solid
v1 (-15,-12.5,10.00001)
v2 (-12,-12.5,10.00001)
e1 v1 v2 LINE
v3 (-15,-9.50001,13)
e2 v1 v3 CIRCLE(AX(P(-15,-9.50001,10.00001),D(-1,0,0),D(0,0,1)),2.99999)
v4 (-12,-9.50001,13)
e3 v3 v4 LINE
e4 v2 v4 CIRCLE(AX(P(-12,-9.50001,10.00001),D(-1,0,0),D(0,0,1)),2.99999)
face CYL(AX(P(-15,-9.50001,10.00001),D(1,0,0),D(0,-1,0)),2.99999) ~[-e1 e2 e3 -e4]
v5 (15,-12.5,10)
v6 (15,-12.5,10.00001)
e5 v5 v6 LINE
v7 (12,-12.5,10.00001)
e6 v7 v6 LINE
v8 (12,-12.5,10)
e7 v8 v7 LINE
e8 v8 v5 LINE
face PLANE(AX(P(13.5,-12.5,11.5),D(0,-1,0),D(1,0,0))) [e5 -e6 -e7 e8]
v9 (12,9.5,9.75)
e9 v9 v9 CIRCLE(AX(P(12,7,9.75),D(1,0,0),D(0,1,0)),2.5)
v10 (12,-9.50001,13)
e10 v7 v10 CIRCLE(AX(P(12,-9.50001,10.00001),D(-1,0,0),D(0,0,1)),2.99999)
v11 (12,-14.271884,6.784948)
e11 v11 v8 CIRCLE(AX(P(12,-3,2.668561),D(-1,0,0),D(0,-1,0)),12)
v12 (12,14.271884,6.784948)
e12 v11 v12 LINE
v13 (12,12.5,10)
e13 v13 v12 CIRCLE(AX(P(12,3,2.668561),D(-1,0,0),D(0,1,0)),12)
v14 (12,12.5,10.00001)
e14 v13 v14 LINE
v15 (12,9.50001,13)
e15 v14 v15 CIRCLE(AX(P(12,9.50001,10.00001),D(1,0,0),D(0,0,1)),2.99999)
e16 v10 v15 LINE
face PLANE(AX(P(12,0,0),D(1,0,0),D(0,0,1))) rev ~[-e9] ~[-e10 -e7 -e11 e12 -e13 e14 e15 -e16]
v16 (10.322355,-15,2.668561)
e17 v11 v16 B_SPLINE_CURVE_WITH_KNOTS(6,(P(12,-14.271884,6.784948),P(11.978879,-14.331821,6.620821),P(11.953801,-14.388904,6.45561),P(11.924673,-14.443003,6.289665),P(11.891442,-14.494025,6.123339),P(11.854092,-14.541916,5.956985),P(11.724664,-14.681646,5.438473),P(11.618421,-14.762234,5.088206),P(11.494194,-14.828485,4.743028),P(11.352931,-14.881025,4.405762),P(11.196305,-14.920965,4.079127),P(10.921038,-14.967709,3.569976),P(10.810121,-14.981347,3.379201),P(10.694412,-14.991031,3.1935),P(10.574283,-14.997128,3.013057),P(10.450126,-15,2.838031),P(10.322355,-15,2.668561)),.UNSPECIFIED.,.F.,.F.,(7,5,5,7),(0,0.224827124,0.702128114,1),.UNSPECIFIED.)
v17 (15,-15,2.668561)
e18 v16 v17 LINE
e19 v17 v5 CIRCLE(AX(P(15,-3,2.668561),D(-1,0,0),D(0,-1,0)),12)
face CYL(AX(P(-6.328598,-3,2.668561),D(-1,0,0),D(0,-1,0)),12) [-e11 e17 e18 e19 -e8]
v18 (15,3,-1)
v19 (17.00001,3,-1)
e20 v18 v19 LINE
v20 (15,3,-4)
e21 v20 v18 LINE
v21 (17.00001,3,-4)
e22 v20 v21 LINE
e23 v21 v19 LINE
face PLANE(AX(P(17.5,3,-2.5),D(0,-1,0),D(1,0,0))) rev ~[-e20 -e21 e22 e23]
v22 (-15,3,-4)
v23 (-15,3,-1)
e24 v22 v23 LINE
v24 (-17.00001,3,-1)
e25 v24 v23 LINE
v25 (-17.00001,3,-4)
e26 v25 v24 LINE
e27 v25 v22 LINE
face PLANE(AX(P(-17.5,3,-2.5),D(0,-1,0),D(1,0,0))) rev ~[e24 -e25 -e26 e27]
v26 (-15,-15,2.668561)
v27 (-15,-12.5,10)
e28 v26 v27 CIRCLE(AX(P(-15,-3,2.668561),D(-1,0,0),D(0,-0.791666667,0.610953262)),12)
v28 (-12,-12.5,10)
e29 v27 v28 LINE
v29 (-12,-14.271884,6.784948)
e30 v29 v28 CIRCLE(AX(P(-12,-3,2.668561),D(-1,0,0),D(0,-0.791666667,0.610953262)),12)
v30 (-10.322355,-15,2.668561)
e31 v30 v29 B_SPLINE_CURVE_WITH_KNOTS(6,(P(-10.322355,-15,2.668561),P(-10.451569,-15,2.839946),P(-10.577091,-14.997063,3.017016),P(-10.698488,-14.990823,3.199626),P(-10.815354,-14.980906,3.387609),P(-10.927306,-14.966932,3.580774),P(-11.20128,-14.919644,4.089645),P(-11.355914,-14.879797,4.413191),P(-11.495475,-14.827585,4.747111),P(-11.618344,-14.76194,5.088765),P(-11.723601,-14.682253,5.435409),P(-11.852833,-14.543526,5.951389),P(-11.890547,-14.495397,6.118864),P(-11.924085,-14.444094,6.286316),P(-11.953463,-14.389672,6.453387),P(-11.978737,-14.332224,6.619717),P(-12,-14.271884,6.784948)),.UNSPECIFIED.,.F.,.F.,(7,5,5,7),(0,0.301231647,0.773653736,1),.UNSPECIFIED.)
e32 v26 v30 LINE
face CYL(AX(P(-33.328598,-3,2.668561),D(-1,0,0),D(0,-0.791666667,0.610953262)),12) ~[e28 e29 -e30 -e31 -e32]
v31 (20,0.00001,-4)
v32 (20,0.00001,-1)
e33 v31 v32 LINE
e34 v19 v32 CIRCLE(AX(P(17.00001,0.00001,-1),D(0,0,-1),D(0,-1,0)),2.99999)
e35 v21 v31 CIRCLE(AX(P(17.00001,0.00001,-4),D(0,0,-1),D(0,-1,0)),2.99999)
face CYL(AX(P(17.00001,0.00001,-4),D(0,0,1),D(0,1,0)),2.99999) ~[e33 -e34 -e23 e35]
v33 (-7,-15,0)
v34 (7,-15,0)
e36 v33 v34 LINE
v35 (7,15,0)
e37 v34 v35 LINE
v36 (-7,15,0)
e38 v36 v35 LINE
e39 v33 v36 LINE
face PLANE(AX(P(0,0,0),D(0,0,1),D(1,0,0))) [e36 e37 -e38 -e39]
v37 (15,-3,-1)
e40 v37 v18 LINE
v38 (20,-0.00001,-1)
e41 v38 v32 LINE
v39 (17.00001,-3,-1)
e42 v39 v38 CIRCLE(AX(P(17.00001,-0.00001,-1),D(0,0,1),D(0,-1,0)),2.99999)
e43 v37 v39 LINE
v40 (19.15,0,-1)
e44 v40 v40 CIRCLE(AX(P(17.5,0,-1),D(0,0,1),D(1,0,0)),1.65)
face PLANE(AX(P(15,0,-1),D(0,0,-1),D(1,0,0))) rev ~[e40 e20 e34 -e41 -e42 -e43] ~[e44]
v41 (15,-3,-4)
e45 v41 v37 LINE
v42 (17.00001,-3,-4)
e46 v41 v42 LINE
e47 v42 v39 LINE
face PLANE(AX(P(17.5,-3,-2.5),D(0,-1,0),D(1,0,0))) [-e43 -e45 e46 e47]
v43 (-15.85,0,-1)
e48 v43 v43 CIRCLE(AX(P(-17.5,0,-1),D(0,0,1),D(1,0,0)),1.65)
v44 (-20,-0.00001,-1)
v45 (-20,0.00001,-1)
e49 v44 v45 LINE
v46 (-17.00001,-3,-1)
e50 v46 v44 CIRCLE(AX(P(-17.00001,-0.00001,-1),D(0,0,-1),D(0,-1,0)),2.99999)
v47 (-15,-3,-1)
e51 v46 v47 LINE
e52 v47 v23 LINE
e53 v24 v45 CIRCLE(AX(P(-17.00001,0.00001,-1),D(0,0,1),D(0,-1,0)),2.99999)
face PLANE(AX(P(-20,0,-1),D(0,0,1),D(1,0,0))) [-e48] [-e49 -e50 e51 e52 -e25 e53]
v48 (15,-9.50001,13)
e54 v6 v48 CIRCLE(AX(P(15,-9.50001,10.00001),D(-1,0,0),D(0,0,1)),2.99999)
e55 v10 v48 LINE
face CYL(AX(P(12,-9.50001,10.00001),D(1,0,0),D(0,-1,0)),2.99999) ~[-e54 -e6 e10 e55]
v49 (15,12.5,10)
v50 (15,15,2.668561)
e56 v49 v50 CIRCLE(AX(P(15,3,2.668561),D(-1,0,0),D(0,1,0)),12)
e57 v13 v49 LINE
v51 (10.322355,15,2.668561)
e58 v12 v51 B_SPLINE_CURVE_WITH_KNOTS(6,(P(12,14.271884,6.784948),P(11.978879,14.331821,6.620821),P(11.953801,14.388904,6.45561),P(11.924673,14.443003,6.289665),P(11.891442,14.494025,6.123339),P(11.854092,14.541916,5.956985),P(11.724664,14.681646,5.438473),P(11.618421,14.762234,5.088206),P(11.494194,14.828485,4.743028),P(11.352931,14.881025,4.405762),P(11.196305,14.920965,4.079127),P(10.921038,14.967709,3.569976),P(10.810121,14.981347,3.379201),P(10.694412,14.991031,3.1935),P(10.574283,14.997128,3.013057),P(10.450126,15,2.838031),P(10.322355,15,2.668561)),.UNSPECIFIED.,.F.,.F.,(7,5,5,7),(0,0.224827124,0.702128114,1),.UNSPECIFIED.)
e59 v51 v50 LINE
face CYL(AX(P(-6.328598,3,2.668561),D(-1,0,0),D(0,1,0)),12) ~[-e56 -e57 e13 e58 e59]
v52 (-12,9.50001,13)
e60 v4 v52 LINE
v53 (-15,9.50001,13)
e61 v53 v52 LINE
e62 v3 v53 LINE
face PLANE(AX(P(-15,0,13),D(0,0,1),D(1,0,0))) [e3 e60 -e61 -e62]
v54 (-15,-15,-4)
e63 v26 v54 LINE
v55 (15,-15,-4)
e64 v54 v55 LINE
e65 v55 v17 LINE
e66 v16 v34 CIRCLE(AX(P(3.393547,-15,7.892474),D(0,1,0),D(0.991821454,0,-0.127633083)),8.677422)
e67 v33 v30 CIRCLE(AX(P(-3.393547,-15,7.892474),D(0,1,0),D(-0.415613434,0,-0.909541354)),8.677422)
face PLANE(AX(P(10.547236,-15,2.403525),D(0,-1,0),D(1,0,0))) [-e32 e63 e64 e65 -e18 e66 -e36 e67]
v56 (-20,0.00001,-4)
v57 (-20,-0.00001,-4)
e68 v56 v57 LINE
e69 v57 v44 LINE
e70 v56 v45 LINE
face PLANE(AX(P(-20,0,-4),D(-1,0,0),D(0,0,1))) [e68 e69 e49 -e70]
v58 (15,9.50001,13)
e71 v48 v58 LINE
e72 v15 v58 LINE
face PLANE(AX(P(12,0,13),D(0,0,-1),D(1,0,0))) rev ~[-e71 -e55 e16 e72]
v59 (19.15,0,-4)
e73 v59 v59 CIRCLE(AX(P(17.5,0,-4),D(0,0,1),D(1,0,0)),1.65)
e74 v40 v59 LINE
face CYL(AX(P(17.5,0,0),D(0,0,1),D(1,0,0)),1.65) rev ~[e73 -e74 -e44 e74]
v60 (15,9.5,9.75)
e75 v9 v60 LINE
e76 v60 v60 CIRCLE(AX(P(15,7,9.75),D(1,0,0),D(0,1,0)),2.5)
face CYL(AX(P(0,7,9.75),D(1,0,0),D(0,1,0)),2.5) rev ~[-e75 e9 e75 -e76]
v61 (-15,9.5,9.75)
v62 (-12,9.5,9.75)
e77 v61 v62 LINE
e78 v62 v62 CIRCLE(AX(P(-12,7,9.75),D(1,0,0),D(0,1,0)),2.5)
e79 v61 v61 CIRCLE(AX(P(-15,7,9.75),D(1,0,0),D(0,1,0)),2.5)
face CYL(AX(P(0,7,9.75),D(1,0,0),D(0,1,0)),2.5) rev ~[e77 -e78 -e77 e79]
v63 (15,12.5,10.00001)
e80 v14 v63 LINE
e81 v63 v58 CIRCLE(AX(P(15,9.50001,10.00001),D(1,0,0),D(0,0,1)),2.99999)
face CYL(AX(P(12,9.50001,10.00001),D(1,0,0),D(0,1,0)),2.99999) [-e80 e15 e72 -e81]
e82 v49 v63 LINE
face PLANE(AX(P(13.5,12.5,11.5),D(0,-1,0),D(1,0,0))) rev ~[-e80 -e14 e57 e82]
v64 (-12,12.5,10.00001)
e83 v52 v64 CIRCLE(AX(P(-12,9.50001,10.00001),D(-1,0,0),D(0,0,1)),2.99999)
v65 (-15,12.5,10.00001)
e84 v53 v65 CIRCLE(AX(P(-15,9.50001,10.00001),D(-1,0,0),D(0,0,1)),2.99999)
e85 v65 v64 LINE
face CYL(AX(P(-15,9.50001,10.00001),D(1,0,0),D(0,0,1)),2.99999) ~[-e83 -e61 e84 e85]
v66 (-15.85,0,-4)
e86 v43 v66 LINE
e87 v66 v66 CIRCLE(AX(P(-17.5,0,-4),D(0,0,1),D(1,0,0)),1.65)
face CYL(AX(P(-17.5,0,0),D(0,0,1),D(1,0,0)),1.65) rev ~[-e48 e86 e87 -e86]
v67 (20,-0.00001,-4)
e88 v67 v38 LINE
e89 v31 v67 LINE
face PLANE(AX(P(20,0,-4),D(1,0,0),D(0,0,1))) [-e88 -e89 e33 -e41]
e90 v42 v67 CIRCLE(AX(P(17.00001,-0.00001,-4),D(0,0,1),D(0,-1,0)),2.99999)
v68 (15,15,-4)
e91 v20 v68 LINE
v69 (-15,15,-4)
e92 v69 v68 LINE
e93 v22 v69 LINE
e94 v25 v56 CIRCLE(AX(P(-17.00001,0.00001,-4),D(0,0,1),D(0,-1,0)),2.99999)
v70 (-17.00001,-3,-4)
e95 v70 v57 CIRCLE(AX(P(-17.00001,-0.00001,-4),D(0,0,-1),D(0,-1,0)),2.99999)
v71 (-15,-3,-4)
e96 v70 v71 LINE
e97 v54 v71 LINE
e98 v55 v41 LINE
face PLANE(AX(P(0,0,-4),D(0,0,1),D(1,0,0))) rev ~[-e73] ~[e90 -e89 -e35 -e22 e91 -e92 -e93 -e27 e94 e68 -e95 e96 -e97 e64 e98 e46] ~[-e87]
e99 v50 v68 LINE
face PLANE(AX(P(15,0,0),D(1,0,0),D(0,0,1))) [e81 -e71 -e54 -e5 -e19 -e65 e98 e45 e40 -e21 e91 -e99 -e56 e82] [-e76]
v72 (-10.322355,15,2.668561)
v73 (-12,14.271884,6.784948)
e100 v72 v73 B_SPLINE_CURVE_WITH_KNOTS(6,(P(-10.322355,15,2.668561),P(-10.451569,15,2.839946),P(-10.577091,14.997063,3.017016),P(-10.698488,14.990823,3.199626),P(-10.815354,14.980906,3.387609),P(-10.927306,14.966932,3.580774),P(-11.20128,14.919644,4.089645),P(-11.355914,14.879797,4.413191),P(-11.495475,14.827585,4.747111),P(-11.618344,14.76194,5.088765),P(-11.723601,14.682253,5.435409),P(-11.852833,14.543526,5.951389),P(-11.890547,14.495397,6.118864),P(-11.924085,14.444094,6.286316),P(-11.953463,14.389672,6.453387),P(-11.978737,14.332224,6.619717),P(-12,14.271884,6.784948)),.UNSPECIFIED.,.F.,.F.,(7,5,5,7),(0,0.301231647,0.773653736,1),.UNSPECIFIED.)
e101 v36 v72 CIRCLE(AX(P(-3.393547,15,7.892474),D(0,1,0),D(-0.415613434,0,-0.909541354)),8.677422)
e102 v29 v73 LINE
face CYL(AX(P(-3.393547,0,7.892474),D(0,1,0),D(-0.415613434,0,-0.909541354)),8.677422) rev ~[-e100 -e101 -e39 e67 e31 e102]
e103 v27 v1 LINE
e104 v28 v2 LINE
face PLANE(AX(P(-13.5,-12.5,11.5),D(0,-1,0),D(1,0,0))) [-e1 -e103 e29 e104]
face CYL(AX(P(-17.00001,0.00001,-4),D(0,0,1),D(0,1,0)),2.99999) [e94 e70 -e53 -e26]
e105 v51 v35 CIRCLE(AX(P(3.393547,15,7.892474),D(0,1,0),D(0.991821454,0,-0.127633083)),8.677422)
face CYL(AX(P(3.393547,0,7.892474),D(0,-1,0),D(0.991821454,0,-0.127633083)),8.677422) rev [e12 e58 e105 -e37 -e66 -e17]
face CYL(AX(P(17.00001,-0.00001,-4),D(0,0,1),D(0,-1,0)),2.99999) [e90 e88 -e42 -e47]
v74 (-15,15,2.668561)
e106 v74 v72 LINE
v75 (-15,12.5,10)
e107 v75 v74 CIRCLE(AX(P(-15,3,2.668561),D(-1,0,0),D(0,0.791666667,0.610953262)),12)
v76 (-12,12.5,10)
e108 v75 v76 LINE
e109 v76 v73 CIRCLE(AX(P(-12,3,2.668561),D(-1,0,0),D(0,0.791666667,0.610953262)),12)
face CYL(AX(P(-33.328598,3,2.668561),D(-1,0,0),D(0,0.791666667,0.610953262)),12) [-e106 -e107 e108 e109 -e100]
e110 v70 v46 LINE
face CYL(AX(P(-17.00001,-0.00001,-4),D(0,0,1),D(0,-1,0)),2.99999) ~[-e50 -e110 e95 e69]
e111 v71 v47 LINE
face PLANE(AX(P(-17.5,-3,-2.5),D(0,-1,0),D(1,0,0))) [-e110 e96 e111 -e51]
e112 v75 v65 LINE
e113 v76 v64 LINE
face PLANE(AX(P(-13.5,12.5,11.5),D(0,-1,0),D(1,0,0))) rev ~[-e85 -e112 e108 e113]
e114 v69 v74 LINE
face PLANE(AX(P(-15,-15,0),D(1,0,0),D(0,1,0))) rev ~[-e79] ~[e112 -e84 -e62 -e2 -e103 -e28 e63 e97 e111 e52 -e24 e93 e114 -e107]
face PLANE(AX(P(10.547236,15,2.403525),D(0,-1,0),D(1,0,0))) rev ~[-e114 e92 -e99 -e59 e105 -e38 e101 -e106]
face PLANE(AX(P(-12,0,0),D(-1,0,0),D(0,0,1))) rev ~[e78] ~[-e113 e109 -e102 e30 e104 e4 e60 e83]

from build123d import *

# Parameters (mm, degrees)
F0_W         = 30
F0_H         = 30
F1_DEPTH     = 4
F2_W         = 3
F2_H         = 10
F3_DEPTH     = 15
F5_DEPTH     = 15
F6_W         = 5
F6_H         = 3
F7_DEPTH     = 3
F8_R         = 2.99999
F9_R         = 1.65
F10_DEPTH    = 25
F11_W        = 3
F11_H        = 3
F12_DEPTH    = 12.5
F13_R        = 2.99999
F14_R        = 2.5
F15_DEPTH    = 18.8
F16_T1_DEPTH = 39.6571957465
F16_T3_DEPTH = 39.6571957465


# Not quite as in the source:
# - a fillet or chamfer that OpenCascade refuses, or shapes differently, is made with other operations: its cross-section is extruded or revolved along the edge and cut away or added
# - a fillet or chamfer is up to 0.001 mm smaller than in the source, because OpenCascade refuses the exact size


with BuildPart() as f1:
    # F0 (on Top) → F1 (new body)
    with BuildSketch(Plane.XY):
        Rectangle(F0_W, F0_H)
    extrude(amount=-F1_DEPTH)

    # F2 (on Front) → F3 (join, symmetric)
    with BuildSketch(Plane.XZ):
        with Locations((-13.5, 5)):
            Rectangle(F2_W, F2_H)
        with Locations((13.5, 5)):
            Rectangle(F2_W, F2_H)
    extrude(amount=F3_DEPTH, both=True)

    # F4 (on Front) → F5 (join, symmetric)
    with BuildSketch(Plane.XZ):
        with BuildLine():
            Line((-12, 6.7849478247), (-12, 9))
            ThreePointArc((-12, 9), (-12.0709686948, 7.8924739124), (-12, 6.7849478247))
        make_face()
        with BuildLine():
            ThreePointArc((-7, 0), (-10.3790782907, 2.7446588419), (-12, 6.7849478247))
            Line((-12, 6.7849478247), (-12, 0))
            Line((-12, 0), (-7, 0))
        make_face()
        with BuildLine():
            Line((12, 0), (12, 6.7849478247))
            ThreePointArc((12, 6.7849478247), (10.3790782907, 2.7446588419), (7, 0))
            Line((7, 0), (12, 0))
        make_face()
        with BuildLine():
            ThreePointArc((12, 6.7849478247), (12.0709686948, 7.8924739124), (12, 9))
            Line((12, 9), (12, 6.7849478247))
        make_face()
    extrude(amount=F5_DEPTH, both=True)

    # F6 (on Front) → F7 (join, symmetric)
    with BuildSketch(Plane.XZ):
        with Locations((-17.5, -2.5)):
            Rectangle(F6_W, F6_H)
        with Locations((17.5, -2.5)):
            Rectangle(F6_W, F6_H)
    extrude(amount=F7_DEPTH, both=True)

    # F8 (radius 3 in the source; OpenCascade refuses exactly that, so slightly less here)
    f8_edges = [f1.edges().sort_by_distance(p)[0] for p in [
        (-20, 3, -2.5),
        (-20, -3, -2.5),
        (20, 3, -2.5),
        (20, -3, -2.5),
    ]]
    fillet(f8_edges, radius=F8_R)

    # F9 (on Top) → F10 (cut)
    with BuildSketch(Plane.XY):
        with Locations((-17.5, 0)):
            Circle(F9_R)
        with Locations((17.5, 0)):
            Circle(F9_R)
    extrude(amount=-F10_DEPTH, mode=Mode.SUBTRACT)

    # F11 (on Front) → F12 (join, symmetric)
    with BuildSketch(Plane.XZ):
        with Locations((-13.5, 11.5)):
            Rectangle(F11_W, F11_H)
        with Locations((13.5, 11.5)):
            Rectangle(F11_W, F11_H)
    extrude(amount=F12_DEPTH, both=True)

    # F13 (radius 3 in the source; OpenCascade refuses exactly that, so slightly less here)
    f13_edges = [f1.edges().sort_by_distance(p)[0] for p in [
        (-13.5, -12.5, 13),
        (-13.5, 12.5, 13),
        (13.5, -12.5, 13),
        (13.5, 12.5, 13),
    ]]
    fillet(f13_edges, radius=F13_R)

    # F14 (on Right) → F15 (cut, symmetric)
    with BuildSketch(Plane.YZ):
        with Locations((7, 9.75)):
            Circle(F14_R)
    extrude(amount=F15_DEPTH, both=True, mode=Mode.SUBTRACT)

    # F16: fillet of radius 12 on 4 edges, made by hand

    # F16_s2 → F16_t1 (cut)
    with BuildSketch(Plane.YZ.offset(-6.3285978733)):
        with BuildLine():
            ThreePointArc((15, 2.6685608507), (14.3578166916, 6.5415441969), (12.5, 10))
            Line((12.5, 10), (15, 10))
            Line((15, 10), (15, 2.6685608507))
        make_face()
        with BuildLine():
            ThreePointArc((-15, 2.6685608507), (-14.3578166916, 6.5415441969), (-12.5, 10))
            Line((-12.5, 10), (-15, 10))
            Line((-15, 10), (-15, 2.6685608507))
        make_face()
    extrude(amount=F16_T1_DEPTH, mode=Mode.SUBTRACT)

    # F16_s4 → F16_t3 (cut)
    with BuildSketch(Plane.YZ.offset(-33.3285978733)):
        with BuildLine():
            ThreePointArc((-12.5, 10), (-14.3578166916, 6.5415441969), (-15, 2.6685608507))
            Line((-15, 2.6685608507), (-15, 10))
            Line((-15, 10), (-12.5, 10))
        make_face()
        with BuildLine():
            ThreePointArc((12.5, 10), (14.3578166916, 6.5415441969), (15, 2.6685608507))
            Line((15, 2.6685608507), (15, 10))
            Line((15, 10), (12.5, 10))
        make_face()
    extrude(amount=F16_T3_DEPTH, mode=Mode.SUBTRACT)


solid = f1.part
